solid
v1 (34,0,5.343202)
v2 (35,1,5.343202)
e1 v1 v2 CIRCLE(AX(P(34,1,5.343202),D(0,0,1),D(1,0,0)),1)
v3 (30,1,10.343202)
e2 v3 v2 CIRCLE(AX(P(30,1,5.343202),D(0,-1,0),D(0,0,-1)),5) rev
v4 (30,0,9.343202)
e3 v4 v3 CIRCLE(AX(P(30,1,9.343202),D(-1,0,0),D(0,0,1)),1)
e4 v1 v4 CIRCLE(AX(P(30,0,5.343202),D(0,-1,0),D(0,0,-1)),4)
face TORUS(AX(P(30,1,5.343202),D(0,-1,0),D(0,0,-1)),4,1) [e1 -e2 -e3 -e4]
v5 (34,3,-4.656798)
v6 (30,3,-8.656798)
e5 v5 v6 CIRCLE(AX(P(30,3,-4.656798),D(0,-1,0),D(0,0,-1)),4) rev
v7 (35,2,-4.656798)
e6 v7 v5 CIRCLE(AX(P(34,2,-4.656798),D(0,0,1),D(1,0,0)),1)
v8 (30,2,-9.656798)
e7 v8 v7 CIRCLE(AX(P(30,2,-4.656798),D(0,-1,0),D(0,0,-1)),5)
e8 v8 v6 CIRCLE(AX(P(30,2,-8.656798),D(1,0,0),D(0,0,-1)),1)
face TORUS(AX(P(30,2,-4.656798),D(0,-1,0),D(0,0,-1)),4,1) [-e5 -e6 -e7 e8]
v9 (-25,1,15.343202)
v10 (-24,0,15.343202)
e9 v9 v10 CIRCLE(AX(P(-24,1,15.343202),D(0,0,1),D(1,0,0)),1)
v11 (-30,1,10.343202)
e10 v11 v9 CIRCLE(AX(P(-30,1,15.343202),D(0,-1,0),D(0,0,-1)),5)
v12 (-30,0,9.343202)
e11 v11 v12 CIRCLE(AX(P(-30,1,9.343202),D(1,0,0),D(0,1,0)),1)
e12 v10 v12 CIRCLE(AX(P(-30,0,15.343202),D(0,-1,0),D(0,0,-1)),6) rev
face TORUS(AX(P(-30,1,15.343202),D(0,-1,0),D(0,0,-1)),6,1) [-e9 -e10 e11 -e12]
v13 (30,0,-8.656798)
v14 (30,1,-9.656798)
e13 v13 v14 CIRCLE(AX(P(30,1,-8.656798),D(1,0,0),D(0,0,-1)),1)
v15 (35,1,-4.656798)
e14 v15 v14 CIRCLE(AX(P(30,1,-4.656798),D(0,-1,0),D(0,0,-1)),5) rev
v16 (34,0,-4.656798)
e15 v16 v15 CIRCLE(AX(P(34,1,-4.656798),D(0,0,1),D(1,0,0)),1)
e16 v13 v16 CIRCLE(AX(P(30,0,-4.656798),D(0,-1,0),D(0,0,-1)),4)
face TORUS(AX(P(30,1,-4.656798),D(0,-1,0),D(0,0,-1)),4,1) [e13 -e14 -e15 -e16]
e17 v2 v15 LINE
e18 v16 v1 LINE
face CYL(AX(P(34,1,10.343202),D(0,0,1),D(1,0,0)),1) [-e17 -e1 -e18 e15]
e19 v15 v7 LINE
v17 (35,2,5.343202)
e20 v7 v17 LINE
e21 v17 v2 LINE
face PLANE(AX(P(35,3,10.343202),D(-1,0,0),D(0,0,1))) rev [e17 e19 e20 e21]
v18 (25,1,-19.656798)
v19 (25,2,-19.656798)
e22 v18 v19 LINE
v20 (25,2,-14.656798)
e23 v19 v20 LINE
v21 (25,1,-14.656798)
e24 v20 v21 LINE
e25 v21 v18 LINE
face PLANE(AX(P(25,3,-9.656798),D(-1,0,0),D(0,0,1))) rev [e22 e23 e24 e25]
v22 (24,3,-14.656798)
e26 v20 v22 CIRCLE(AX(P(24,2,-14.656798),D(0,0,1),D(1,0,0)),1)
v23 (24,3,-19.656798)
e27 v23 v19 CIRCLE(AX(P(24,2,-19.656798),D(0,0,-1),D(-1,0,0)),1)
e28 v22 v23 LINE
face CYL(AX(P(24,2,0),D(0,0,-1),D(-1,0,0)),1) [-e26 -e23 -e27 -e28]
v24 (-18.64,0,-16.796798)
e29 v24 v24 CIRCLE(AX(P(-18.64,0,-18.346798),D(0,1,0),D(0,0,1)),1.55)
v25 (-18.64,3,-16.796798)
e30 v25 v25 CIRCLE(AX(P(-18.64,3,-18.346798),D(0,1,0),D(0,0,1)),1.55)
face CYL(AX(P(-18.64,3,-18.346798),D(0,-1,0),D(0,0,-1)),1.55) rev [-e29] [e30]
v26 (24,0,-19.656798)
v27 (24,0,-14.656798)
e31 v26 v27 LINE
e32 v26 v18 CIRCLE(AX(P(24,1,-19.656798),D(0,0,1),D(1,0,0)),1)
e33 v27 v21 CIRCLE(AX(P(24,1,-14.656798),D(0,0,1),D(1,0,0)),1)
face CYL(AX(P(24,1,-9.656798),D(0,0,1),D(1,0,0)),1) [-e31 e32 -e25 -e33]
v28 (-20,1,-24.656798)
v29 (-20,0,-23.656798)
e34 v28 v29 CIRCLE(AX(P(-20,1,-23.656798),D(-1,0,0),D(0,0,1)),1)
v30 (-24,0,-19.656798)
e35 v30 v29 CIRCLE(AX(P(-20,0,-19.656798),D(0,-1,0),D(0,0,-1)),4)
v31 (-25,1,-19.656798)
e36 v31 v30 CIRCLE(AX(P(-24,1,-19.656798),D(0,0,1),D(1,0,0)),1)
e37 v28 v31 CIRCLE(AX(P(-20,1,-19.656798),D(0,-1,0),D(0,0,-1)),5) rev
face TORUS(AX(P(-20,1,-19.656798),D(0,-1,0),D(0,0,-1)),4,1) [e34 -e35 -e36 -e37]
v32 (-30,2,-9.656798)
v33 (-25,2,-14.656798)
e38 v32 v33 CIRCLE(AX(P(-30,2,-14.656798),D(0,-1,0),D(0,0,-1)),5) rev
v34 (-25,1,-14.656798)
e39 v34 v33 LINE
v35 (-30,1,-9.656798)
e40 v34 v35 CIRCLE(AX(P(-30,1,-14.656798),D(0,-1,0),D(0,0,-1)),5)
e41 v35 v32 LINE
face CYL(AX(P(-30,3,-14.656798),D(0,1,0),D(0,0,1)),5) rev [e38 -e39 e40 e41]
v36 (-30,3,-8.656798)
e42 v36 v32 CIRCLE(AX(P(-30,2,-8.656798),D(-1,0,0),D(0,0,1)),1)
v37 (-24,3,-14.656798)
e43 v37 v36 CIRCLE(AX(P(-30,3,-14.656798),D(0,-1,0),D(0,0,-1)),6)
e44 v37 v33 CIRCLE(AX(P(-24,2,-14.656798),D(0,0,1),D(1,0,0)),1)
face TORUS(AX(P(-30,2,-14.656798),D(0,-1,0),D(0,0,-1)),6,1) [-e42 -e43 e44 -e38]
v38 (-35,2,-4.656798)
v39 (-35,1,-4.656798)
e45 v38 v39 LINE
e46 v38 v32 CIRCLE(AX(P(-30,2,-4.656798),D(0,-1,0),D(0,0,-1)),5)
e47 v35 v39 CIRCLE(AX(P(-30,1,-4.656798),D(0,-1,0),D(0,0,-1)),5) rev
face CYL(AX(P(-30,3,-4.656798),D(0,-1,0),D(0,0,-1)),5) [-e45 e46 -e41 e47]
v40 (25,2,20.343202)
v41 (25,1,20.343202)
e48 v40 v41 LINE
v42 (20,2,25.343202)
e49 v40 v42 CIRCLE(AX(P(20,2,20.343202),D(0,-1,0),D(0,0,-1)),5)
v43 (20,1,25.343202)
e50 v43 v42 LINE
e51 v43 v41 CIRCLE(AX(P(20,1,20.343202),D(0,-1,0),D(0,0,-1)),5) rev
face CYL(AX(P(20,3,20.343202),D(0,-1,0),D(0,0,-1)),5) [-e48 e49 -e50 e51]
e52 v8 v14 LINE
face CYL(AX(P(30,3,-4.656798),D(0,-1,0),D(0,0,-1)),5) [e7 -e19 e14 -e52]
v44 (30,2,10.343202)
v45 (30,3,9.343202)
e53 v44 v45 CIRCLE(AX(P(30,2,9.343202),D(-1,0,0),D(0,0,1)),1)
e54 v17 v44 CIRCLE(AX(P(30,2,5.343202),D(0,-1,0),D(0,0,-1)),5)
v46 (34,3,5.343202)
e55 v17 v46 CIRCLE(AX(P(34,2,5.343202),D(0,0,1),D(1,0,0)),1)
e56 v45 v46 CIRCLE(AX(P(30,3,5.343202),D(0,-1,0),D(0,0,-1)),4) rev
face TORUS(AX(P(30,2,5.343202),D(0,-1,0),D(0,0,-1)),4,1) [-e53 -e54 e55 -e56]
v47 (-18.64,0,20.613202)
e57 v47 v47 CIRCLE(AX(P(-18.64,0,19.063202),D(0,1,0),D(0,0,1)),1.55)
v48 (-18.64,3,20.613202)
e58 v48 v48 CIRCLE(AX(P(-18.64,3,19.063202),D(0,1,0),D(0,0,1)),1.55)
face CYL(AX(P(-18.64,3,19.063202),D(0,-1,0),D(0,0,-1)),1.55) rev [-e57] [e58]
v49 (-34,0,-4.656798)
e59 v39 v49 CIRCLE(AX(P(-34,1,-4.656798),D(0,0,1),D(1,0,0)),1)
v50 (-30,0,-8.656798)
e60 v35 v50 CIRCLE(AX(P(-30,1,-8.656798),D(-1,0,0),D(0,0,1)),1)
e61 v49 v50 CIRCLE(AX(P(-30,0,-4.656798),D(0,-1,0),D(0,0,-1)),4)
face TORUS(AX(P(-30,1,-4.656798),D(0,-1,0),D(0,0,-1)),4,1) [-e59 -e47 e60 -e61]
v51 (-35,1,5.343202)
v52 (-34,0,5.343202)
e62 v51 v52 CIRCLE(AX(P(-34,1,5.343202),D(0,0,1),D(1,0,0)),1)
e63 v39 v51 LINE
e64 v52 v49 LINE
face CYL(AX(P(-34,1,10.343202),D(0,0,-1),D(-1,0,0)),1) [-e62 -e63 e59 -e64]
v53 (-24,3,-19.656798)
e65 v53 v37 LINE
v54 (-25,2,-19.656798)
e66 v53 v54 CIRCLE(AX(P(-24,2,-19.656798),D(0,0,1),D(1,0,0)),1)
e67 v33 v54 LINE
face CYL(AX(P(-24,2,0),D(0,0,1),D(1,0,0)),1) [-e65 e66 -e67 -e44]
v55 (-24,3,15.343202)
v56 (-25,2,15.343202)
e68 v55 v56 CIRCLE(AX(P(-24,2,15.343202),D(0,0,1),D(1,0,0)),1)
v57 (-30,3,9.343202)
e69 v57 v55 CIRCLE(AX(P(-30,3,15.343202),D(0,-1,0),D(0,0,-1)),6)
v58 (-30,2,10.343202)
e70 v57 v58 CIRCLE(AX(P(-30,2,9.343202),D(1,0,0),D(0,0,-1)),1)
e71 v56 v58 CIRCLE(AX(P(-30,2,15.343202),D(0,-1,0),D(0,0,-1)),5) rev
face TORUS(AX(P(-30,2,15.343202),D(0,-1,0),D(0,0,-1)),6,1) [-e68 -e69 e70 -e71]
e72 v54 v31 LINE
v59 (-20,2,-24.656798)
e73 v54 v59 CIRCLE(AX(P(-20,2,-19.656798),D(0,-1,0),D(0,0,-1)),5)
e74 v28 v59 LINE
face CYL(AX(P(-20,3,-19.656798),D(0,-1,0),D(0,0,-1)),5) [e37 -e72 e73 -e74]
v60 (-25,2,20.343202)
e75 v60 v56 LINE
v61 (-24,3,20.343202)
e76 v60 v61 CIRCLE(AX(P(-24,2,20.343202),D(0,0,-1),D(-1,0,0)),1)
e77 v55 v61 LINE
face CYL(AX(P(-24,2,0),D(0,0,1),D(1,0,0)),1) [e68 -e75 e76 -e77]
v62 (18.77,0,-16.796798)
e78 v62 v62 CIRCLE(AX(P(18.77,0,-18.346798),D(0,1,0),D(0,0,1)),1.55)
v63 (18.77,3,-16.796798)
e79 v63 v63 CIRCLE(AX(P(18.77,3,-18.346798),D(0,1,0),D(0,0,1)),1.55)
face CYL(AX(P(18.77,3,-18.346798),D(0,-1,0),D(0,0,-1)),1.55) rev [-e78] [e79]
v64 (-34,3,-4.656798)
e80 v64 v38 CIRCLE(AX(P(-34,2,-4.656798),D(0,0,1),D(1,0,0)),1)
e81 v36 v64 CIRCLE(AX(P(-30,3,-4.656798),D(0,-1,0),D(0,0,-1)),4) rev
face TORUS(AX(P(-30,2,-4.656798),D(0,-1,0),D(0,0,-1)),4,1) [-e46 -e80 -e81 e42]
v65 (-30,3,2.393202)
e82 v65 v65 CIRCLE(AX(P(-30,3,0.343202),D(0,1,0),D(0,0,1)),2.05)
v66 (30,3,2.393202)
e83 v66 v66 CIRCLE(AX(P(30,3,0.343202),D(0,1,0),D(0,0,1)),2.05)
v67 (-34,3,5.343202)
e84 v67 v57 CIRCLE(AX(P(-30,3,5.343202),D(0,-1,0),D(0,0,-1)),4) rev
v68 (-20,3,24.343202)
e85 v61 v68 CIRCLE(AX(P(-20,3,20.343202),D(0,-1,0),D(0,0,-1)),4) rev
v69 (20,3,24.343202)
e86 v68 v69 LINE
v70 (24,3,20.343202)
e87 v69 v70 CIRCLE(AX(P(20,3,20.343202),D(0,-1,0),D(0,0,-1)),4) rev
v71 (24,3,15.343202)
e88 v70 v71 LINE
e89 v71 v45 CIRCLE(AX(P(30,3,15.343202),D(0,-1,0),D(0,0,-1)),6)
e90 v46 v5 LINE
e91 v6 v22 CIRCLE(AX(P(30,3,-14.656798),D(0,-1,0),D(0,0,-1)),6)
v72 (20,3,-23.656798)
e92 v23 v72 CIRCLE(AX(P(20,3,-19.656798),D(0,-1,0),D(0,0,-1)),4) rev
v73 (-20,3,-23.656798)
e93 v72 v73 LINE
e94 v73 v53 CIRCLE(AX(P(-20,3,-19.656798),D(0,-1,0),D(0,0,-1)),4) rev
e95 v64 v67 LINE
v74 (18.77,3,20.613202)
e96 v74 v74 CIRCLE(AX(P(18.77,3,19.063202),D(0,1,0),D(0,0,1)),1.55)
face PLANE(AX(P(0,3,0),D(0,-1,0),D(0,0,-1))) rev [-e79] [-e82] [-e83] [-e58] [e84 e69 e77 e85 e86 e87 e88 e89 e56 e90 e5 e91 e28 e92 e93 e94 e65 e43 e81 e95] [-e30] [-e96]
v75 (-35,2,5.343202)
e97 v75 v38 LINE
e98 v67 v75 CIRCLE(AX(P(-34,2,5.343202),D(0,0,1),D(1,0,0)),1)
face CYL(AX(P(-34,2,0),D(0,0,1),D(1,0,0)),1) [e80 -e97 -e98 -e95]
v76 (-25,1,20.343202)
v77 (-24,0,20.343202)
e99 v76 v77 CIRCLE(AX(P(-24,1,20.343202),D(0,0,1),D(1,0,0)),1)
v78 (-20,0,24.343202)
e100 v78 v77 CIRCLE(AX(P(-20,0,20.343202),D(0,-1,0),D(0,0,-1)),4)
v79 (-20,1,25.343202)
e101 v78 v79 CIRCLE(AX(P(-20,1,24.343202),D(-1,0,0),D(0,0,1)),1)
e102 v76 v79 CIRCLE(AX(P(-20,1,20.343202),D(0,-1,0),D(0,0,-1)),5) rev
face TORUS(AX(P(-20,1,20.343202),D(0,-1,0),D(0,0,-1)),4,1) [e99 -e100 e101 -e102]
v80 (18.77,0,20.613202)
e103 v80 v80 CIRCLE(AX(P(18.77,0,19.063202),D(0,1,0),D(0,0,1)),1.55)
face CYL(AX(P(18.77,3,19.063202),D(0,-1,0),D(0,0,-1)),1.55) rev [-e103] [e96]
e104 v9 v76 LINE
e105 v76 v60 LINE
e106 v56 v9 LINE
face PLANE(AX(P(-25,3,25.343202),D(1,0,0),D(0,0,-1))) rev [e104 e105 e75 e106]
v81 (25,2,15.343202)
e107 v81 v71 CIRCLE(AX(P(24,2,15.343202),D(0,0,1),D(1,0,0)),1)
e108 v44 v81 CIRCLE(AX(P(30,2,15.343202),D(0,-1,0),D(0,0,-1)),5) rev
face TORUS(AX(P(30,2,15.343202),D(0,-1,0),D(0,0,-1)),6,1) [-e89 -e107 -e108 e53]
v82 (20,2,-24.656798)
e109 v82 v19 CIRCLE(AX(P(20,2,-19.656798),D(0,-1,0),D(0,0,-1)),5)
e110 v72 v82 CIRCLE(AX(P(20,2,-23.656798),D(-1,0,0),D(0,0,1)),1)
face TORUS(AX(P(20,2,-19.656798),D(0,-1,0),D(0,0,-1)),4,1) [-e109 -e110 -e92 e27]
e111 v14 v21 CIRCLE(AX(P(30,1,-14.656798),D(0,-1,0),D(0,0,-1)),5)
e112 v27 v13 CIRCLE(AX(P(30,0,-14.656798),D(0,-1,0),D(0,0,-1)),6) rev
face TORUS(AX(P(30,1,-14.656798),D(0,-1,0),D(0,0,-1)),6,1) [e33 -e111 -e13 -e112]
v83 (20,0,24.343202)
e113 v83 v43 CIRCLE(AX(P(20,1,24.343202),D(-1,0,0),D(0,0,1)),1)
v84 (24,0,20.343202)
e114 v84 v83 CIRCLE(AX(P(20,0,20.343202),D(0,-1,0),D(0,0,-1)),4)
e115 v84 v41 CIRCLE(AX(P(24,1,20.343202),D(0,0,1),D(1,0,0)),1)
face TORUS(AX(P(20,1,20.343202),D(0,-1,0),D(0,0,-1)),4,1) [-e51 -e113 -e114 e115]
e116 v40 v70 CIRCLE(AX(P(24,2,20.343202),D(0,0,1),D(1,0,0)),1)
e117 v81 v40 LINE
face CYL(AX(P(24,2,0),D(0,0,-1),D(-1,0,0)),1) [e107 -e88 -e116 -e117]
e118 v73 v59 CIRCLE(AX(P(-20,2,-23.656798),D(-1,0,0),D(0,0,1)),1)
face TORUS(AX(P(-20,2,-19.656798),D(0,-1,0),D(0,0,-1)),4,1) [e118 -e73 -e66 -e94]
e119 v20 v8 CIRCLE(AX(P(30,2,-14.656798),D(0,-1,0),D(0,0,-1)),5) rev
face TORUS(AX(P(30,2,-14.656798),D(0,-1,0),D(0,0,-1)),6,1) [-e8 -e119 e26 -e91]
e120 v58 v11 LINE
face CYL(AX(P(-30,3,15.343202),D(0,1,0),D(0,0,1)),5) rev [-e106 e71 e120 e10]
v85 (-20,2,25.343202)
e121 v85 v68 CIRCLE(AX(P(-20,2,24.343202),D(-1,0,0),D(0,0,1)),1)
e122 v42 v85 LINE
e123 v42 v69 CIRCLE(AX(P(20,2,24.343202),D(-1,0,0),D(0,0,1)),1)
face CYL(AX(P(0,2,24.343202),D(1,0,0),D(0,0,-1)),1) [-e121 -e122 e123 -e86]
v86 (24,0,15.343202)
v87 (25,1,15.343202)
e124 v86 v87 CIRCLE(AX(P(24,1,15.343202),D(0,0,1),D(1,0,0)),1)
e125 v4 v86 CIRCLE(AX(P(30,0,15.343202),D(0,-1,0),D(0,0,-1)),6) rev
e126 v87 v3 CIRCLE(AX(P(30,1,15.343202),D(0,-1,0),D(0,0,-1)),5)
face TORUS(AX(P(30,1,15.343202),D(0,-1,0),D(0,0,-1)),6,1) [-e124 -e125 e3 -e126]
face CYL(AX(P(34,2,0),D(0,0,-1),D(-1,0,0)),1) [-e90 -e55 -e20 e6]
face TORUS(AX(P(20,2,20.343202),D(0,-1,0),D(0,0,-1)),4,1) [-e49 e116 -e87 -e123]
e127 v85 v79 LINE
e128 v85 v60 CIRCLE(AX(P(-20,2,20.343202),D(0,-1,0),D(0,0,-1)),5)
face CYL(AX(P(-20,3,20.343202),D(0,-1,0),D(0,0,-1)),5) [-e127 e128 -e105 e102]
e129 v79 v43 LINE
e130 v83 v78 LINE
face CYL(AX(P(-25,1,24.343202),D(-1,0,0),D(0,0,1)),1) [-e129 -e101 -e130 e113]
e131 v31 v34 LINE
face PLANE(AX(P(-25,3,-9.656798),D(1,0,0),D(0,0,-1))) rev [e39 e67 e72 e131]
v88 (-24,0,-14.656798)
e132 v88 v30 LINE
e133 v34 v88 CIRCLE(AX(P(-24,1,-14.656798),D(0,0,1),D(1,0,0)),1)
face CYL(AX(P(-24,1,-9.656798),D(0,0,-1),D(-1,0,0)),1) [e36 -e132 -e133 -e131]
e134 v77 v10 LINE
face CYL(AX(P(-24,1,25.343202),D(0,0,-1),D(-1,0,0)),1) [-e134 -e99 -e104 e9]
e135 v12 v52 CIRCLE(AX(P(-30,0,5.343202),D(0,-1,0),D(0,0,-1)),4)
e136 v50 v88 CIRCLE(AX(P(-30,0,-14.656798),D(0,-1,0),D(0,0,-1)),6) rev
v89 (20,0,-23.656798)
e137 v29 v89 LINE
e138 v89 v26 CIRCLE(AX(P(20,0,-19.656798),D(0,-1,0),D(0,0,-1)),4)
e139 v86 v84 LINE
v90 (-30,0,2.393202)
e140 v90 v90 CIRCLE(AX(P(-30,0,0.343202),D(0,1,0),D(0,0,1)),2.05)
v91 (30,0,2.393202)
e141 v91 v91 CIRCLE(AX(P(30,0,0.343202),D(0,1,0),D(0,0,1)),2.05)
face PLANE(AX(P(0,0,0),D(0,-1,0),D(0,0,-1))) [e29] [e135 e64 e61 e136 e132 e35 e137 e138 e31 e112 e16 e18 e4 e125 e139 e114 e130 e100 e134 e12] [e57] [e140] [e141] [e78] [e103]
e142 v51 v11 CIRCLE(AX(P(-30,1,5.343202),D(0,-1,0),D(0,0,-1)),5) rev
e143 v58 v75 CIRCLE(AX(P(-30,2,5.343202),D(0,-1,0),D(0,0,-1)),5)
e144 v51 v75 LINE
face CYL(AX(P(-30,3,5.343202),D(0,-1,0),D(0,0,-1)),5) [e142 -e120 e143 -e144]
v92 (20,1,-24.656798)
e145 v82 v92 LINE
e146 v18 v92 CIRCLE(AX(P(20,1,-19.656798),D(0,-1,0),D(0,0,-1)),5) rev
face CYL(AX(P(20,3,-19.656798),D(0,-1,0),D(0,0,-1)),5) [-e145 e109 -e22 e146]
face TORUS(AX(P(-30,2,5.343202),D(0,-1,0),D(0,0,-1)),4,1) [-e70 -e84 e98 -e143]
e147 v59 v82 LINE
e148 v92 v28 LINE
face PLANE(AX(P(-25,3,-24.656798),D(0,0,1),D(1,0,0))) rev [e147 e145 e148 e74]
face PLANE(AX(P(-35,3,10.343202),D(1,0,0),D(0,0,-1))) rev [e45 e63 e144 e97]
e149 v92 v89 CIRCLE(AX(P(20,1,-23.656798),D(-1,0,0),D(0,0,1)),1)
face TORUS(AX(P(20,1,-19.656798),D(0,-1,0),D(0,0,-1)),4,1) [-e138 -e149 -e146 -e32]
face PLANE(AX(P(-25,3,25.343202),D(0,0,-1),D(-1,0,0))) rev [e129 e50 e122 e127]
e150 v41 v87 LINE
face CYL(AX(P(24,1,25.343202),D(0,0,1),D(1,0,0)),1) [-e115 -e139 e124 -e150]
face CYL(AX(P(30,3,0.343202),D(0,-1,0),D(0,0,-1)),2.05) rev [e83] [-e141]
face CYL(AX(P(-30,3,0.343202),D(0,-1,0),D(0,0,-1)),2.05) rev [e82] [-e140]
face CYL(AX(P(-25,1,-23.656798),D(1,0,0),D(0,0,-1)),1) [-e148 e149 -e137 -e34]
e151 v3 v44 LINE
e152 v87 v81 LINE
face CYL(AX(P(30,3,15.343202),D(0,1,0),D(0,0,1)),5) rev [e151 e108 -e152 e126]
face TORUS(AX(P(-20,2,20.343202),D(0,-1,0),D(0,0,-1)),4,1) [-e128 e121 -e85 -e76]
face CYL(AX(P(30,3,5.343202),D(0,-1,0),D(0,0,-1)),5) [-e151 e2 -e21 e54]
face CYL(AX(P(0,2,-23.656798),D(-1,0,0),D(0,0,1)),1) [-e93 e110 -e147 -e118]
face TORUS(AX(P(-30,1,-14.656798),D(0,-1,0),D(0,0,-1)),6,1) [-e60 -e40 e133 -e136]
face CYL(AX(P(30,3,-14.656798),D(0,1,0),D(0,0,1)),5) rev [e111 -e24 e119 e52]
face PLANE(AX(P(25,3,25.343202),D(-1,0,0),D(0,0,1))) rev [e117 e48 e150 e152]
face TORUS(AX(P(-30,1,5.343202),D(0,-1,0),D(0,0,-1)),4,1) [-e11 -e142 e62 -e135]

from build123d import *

# Parameters (mm, degrees)
CROQUIS1_R              = 1.55
CROQUIS1_R_2            = 2.05
SALIENTE_EXTRUIR1_DEPTH = 3
REDONDEO1_R             = 5
REDONDEO2_R             = 5
REDONDEO6_R             = 1
REDONDEO7_R             = 1


with BuildPart() as part:
    # Croquis1 → Saliente-Extruir1 (new body)
    with BuildSketch(Plane(origin=(0, 0, 0), x_dir=(1, 0, 0), z_dir=(0, 1, 0))):
        Polygon((25, 9.656797923), (35, 9.656797923), (35, -10.343202077), (25, -10.343202077), (25, -25.343202077), (-25, -25.343202077), (-25, -10.343202077), (-35, -10.343202077), (-35, 9.656797923), (-25, 9.656797923), (-25, 24.656797923), (25, 24.656797923), align=None)
        with Locations(Location((-18.64, -19.063202077, 0), (0, 0, 270))):
            Circle(CROQUIS1_R, mode=Mode.SUBTRACT)
        with Locations(Location((18.77, -19.063202077, 0), (0, 0, 270))):
            Circle(CROQUIS1_R, mode=Mode.SUBTRACT)
        with Locations(Location((18.77, 18.346797923, 0), (0, 0, 270))):
            Circle(CROQUIS1_R, mode=Mode.SUBTRACT)
        with Locations(Location((-18.64, 18.346797923, 0), (0, 0, 270))):
            Circle(CROQUIS1_R, mode=Mode.SUBTRACT)
        with Locations(Location((-30, -0.343202077, 0), (0, 0, 270))):
            Circle(CROQUIS1_R_2, mode=Mode.SUBTRACT)
        with Locations(Location((30, -0.343202077, 0), (0, 0, 270))):
            Circle(CROQUIS1_R_2, mode=Mode.SUBTRACT)
    extrude(amount=SALIENTE_EXTRUIR1_DEPTH)

    # Redondeo1
    redondeo1_edges = [part.edges().sort_by_distance(p)[0] for p in [
        (35, 1.5, -9.656797923),
        (35, 1.5, 10.343202077),
        (25, 1.5, 25.343202077),
        (-25, 1.5, 25.343202077),
        (-35, 1.5, 10.343202077),
        (-35, 1.5, -9.656797923),
        (-25, 1.5, -24.656797923),
        (25, 1.5, -24.656797923),
    ]]
    fillet(redondeo1_edges, radius=REDONDEO1_R)

    # Redondeo2
    redondeo2_edges = [part.edges().sort_by_distance(p)[0] for p in [
        (25, 1.5, -9.656797923),
        (-25, 1.5, -9.656797923),
        (-25, 1.5, 10.343202077),
        (25, 1.5, 10.343202077),
    ]]
    fillet(redondeo2_edges, radius=REDONDEO2_R - 0.0001)  # a hair under: the kernel refuses the full size

    # Redondeo6
    redondeo6_edges = [part.edges().sort_by_distance(p)[0] for p in [
        (25, 3, -17.156747923),
        (-25, 3, 17.843152077),
        (26.464436805, 3, -11.121234728),
        (-26.464436805, 3, -11.121234728),
        (-26.464436805, 3, 11.807638881),
        (26.464436805, 3, 11.807638881),
        (-35, 3, 0.343202077),
        (0, 3, -24.656797923),
        (-25, 3, -17.156747923),
        (0, 3, 25.343202077),
        (25, 3, 17.843152077),
        (35, 3, 0.343202077),
        (-33.535533906, 3, 8.878735982),
        (-23.535533906, 3, 23.878735982),
        (23.535533906, 3, 23.878735982),
        (33.535533906, 3, 8.878735982),
        (33.535533906, 3, -8.192331829),
        (23.535533906, 3, -23.192331829),
        (-23.535533906, 3, -23.192331829),
        (-33.535533906, 3, -8.192331829),
    ]]
    fillet(redondeo6_edges, radius=REDONDEO6_R)

    # Redondeo7
    redondeo7_edges = [part.edges().sort_by_distance(p)[0] for p in [
        (25, 0, -17.156747923),
        (-25, 0, 17.843152077),
        (26.464436805, 0, -11.121234728),
        (-26.464436805, 0, -11.121234728),
        (-26.464436805, 0, 11.807638881),
        (26.464436805, 0, 11.807638881),
        (-35, 0, 0.343202077),
        (35, 0, 0.343202077),
        (25, 0, 17.843152077),
        (0, 0, 25.343202077),
        (-25, 0, -17.156747923),
        (0, 0, -24.656797923),
        (-33.535533906, 0, 8.878735982),
        (-23.535533906, 0, 23.878735982),
        (23.535533906, 0, 23.878735982),
        (33.535533906, 0, 8.878735982),
        (33.535533906, 0, -8.192331829),
        (23.535533906, 0, -23.192331829),
        (-23.535533906, 0, -23.192331829),
        (-33.535533906, 0, -8.192331829),
    ]]
    fillet(redondeo7_edges, radius=REDONDEO7_R)


solid = part.part
